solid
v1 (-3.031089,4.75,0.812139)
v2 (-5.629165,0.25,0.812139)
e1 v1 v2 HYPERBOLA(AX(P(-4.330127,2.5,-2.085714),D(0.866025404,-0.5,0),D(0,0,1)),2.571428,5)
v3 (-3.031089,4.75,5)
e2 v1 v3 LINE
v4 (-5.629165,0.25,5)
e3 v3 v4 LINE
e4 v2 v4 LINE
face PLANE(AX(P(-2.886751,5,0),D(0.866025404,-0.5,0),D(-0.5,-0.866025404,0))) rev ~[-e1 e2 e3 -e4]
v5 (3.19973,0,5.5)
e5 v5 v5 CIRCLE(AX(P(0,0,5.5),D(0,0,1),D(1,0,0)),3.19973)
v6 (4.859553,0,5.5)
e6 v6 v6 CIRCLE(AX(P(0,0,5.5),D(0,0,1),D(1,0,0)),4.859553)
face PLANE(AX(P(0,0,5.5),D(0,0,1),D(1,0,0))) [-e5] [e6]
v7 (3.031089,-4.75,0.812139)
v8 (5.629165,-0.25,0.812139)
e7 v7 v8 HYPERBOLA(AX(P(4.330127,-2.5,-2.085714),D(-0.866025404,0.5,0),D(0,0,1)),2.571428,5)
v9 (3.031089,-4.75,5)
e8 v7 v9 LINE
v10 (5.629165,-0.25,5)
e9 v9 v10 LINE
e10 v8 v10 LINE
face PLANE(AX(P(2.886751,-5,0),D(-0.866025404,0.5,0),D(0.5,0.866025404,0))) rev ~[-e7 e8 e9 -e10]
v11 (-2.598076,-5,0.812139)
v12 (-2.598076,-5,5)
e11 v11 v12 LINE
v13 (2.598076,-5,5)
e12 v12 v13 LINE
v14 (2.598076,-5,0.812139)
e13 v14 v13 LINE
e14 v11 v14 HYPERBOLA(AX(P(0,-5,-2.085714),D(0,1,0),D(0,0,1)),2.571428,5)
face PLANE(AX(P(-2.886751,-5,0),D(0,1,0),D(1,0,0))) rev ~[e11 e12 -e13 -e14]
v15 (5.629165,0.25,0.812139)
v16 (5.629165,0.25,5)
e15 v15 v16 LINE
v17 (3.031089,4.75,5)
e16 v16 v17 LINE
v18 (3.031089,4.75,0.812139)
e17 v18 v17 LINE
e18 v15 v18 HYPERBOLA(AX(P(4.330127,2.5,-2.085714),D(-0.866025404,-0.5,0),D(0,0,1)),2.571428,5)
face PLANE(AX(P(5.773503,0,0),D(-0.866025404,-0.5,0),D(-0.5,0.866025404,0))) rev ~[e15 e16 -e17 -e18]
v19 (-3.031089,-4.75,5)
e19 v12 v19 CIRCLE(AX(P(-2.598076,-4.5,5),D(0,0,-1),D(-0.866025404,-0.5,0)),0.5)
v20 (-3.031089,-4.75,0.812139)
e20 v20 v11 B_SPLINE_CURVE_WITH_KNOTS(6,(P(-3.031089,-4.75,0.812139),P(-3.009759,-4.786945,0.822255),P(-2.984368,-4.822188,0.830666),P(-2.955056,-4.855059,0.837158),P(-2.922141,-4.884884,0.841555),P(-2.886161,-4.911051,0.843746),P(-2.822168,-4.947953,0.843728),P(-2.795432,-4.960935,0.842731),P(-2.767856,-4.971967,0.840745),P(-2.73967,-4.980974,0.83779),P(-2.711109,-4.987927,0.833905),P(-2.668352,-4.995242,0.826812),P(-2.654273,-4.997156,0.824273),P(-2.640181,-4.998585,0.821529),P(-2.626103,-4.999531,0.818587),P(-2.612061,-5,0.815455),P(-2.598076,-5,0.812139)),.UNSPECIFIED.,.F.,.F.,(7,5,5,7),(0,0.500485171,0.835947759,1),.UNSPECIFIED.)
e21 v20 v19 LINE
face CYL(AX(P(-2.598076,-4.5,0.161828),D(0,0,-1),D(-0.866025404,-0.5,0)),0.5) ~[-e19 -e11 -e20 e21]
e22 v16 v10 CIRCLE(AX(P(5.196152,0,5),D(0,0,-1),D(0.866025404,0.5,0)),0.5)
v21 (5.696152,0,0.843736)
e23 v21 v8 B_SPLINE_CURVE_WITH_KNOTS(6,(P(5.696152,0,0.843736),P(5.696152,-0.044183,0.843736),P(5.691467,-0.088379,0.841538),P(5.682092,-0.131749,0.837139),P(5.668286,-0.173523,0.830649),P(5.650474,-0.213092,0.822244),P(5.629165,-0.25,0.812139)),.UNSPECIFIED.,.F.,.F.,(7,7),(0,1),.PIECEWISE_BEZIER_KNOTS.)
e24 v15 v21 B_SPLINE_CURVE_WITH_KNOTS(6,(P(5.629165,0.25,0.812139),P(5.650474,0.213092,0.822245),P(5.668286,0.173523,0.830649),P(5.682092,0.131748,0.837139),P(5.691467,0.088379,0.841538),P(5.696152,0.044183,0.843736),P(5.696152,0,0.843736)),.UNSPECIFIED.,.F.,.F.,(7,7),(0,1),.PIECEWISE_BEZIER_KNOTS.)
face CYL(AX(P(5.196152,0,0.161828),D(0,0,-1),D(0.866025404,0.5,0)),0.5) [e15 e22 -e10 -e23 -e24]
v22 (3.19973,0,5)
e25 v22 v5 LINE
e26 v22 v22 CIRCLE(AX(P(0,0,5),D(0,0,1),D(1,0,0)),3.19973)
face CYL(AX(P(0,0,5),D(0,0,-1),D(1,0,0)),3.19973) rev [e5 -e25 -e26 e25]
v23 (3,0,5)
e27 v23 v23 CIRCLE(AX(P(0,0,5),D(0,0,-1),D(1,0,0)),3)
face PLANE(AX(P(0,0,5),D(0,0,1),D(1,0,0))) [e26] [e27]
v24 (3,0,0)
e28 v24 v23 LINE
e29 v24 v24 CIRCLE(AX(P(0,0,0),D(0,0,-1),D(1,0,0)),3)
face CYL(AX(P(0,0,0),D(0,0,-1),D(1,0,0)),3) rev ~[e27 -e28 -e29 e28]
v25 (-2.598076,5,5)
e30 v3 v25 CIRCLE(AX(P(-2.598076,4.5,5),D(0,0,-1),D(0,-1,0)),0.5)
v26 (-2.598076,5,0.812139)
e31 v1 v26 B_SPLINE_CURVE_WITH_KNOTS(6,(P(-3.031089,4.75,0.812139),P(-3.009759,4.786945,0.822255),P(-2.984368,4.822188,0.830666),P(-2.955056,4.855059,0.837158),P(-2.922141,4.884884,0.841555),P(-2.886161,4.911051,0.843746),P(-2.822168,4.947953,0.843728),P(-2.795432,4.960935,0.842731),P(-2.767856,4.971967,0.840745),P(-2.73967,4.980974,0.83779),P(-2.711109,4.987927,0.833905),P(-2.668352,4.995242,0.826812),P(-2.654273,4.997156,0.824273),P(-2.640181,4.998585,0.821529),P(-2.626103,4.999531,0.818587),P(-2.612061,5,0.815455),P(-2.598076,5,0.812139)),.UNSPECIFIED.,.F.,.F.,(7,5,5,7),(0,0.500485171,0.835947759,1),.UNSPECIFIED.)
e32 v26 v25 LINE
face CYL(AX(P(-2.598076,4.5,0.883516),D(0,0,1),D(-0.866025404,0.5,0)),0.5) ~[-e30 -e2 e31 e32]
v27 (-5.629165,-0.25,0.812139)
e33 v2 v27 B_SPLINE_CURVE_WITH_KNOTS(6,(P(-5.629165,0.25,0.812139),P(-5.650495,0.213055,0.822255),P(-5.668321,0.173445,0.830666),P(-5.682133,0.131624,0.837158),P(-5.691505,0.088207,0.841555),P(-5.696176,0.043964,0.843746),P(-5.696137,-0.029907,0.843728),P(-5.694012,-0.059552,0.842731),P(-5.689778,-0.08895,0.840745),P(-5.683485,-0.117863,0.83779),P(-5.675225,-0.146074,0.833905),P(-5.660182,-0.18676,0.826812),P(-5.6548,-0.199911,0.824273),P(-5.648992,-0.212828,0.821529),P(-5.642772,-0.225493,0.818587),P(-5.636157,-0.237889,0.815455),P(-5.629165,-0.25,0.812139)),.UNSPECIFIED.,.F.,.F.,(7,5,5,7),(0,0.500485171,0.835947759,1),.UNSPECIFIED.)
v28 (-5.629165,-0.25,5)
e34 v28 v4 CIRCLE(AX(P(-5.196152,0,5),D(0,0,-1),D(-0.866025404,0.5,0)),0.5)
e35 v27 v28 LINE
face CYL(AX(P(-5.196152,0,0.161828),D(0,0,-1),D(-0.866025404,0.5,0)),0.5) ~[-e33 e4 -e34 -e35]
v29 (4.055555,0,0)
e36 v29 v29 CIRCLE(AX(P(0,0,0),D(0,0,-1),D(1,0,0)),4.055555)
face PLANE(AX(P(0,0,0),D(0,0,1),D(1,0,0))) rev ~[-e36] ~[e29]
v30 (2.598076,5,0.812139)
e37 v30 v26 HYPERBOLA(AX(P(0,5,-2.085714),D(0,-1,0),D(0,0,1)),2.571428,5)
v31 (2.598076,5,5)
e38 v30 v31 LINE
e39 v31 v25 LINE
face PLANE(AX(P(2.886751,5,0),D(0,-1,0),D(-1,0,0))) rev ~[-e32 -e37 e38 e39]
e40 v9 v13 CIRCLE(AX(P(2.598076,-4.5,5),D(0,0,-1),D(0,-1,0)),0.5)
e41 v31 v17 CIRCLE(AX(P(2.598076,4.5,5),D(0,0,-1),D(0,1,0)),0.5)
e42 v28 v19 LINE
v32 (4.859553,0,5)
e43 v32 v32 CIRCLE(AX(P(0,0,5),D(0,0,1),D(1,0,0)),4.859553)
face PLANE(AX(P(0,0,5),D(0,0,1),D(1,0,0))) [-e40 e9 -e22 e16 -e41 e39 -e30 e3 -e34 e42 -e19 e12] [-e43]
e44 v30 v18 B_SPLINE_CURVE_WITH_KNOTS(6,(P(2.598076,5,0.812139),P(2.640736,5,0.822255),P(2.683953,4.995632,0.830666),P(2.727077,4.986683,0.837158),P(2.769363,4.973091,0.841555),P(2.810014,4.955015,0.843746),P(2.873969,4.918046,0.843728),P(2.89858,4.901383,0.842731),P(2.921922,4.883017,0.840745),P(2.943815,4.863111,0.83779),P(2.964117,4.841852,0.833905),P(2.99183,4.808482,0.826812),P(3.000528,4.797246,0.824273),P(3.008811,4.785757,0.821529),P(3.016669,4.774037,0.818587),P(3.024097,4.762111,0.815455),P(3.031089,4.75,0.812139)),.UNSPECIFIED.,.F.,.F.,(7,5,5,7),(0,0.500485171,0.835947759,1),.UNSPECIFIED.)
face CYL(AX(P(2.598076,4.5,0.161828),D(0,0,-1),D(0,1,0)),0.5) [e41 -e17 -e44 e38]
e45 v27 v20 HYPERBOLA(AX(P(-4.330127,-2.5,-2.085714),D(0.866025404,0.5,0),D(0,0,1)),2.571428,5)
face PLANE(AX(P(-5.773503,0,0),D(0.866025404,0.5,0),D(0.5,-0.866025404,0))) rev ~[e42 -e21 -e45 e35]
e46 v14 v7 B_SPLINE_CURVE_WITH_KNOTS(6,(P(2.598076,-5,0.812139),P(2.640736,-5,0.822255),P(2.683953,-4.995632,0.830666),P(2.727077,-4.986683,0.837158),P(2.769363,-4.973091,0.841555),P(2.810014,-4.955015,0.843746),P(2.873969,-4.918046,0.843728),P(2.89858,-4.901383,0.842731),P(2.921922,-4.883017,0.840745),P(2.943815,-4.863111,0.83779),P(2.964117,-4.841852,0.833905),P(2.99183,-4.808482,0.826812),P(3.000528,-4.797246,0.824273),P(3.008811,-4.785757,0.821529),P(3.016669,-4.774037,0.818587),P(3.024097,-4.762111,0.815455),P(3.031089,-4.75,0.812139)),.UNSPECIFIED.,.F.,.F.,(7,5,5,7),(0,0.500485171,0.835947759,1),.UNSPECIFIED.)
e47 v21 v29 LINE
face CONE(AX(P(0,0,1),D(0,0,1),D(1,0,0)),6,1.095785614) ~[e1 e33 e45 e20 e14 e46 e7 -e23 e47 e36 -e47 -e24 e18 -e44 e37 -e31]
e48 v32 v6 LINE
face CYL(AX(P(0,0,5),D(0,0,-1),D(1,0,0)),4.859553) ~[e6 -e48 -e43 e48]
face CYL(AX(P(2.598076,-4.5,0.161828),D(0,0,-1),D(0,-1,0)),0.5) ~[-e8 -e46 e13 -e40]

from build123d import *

# Parameters (mm, degrees)
F1_DEPTH    = 5
F4_R        = 3
F5_DEPTH    = 5.001
F6_R        = 0.5
F7_T1_DEPTH = 5.5598599904
F9_R        = 4.8595532258
F9_R_2      = 3.1997304912
F10_DEPTH   = 0.5


# Not quite as in the source:
# - a fillet or chamfer that OpenCascade refuses, or shapes differently, is made with other operations: its cross-section is extruded or revolved along the edge and cut away or added


with BuildPart() as f1:
    # F0 (on Top) → F1 (new body)
    with BuildSketch(Plane.XY):
        Polygon((-2.8867513459, 5), (-5.7735026919, 0), (-2.8867513459, -5), (2.8867513459, -5), (5.7735026919, 0), (2.8867513459, 5), align=None)
    extrude(amount=F1_DEPTH)

    # F2 (on Front) → F3 (revolve, cut)
    with BuildSketch(Plane.XZ):
        Polygon((6, 1), (3.5, -0.285714148), (6, -0.285714148), align=None)
    revolve(axis=Axis((0, 0, 1.7616122495), (0, 0, 1)), mode=Mode.SUBTRACT)

    # F4 (on face) → F5 (cut, through all)
    with BuildSketch(Plane(origin=(0, 0, 0), x_dir=(1, 0, 0), z_dir=(0, 0, -1))):
        Circle(F4_R)
    extrude(amount=-F5_DEPTH, mode=Mode.SUBTRACT)

    # F6
    f6_edges = [f1.edges().sort_by_distance(p)[0] for p in [
        (-2.886751, 5, 2.941758),
    ]]
    fillet(f6_edges, radius=F6_R)

    # F7: fillet of radius 0.5 on 5 edges, made by hand

    # F7_s2 → F7_t1 (cut)
    with BuildSketch(Plane.XY.offset(0.1618278461)):
        with BuildLine():
            ThreePointArc((-5.6291651246, 0.25), (-5.6961524227, 0), (-5.6291651246, -0.25))
            Line((-5.6291651246, -0.25), (-5.7735026919, 0))
            Line((-5.7735026919, 0), (-5.6291651246, 0.25))
        make_face()
        with BuildLine():
            ThreePointArc((-3.0310889132, -4.75), (-2.8480762114, -4.9330127019), (-2.5980762114, -5))
            Line((-2.5980762114, -5), (-2.8867513459, -5))
            Line((-2.8867513459, -5), (-3.0310889132, -4.75))
        make_face()
        with BuildLine():
            ThreePointArc((2.5980762114, -5), (2.8480762114, -4.9330127019), (3.0310889132, -4.75))
            Line((3.0310889132, -4.75), (2.8867513459, -5))
            Line((2.8867513459, -5), (2.5980762114, -5))
        make_face()
        with BuildLine():
            ThreePointArc((5.6291651246, 0.25), (5.6961524227, 0), (5.6291651246, -0.25))
            Line((5.6291651246, -0.25), (5.7735026919, 0))
            Line((5.7735026919, 0), (5.6291651246, 0.25))
        make_face()
        with BuildLine():
            ThreePointArc((2.5980762114, 5), (2.8480762114, 4.9330127019), (3.0310889132, 4.75))
            Line((3.0310889132, 4.75), (2.8867513459, 5))
            Line((2.8867513459, 5), (2.5980762114, 5))
        make_face()
    extrude(amount=F7_T1_DEPTH, mode=Mode.SUBTRACT)

    # F9 (on face) → F10 (join)
    with BuildSketch(Plane.XY.offset(5)):
        Circle(F9_R)
        Circle(F9_R_2, mode=Mode.SUBTRACT)
    extrude(amount=F10_DEPTH)


solid = f1.part
